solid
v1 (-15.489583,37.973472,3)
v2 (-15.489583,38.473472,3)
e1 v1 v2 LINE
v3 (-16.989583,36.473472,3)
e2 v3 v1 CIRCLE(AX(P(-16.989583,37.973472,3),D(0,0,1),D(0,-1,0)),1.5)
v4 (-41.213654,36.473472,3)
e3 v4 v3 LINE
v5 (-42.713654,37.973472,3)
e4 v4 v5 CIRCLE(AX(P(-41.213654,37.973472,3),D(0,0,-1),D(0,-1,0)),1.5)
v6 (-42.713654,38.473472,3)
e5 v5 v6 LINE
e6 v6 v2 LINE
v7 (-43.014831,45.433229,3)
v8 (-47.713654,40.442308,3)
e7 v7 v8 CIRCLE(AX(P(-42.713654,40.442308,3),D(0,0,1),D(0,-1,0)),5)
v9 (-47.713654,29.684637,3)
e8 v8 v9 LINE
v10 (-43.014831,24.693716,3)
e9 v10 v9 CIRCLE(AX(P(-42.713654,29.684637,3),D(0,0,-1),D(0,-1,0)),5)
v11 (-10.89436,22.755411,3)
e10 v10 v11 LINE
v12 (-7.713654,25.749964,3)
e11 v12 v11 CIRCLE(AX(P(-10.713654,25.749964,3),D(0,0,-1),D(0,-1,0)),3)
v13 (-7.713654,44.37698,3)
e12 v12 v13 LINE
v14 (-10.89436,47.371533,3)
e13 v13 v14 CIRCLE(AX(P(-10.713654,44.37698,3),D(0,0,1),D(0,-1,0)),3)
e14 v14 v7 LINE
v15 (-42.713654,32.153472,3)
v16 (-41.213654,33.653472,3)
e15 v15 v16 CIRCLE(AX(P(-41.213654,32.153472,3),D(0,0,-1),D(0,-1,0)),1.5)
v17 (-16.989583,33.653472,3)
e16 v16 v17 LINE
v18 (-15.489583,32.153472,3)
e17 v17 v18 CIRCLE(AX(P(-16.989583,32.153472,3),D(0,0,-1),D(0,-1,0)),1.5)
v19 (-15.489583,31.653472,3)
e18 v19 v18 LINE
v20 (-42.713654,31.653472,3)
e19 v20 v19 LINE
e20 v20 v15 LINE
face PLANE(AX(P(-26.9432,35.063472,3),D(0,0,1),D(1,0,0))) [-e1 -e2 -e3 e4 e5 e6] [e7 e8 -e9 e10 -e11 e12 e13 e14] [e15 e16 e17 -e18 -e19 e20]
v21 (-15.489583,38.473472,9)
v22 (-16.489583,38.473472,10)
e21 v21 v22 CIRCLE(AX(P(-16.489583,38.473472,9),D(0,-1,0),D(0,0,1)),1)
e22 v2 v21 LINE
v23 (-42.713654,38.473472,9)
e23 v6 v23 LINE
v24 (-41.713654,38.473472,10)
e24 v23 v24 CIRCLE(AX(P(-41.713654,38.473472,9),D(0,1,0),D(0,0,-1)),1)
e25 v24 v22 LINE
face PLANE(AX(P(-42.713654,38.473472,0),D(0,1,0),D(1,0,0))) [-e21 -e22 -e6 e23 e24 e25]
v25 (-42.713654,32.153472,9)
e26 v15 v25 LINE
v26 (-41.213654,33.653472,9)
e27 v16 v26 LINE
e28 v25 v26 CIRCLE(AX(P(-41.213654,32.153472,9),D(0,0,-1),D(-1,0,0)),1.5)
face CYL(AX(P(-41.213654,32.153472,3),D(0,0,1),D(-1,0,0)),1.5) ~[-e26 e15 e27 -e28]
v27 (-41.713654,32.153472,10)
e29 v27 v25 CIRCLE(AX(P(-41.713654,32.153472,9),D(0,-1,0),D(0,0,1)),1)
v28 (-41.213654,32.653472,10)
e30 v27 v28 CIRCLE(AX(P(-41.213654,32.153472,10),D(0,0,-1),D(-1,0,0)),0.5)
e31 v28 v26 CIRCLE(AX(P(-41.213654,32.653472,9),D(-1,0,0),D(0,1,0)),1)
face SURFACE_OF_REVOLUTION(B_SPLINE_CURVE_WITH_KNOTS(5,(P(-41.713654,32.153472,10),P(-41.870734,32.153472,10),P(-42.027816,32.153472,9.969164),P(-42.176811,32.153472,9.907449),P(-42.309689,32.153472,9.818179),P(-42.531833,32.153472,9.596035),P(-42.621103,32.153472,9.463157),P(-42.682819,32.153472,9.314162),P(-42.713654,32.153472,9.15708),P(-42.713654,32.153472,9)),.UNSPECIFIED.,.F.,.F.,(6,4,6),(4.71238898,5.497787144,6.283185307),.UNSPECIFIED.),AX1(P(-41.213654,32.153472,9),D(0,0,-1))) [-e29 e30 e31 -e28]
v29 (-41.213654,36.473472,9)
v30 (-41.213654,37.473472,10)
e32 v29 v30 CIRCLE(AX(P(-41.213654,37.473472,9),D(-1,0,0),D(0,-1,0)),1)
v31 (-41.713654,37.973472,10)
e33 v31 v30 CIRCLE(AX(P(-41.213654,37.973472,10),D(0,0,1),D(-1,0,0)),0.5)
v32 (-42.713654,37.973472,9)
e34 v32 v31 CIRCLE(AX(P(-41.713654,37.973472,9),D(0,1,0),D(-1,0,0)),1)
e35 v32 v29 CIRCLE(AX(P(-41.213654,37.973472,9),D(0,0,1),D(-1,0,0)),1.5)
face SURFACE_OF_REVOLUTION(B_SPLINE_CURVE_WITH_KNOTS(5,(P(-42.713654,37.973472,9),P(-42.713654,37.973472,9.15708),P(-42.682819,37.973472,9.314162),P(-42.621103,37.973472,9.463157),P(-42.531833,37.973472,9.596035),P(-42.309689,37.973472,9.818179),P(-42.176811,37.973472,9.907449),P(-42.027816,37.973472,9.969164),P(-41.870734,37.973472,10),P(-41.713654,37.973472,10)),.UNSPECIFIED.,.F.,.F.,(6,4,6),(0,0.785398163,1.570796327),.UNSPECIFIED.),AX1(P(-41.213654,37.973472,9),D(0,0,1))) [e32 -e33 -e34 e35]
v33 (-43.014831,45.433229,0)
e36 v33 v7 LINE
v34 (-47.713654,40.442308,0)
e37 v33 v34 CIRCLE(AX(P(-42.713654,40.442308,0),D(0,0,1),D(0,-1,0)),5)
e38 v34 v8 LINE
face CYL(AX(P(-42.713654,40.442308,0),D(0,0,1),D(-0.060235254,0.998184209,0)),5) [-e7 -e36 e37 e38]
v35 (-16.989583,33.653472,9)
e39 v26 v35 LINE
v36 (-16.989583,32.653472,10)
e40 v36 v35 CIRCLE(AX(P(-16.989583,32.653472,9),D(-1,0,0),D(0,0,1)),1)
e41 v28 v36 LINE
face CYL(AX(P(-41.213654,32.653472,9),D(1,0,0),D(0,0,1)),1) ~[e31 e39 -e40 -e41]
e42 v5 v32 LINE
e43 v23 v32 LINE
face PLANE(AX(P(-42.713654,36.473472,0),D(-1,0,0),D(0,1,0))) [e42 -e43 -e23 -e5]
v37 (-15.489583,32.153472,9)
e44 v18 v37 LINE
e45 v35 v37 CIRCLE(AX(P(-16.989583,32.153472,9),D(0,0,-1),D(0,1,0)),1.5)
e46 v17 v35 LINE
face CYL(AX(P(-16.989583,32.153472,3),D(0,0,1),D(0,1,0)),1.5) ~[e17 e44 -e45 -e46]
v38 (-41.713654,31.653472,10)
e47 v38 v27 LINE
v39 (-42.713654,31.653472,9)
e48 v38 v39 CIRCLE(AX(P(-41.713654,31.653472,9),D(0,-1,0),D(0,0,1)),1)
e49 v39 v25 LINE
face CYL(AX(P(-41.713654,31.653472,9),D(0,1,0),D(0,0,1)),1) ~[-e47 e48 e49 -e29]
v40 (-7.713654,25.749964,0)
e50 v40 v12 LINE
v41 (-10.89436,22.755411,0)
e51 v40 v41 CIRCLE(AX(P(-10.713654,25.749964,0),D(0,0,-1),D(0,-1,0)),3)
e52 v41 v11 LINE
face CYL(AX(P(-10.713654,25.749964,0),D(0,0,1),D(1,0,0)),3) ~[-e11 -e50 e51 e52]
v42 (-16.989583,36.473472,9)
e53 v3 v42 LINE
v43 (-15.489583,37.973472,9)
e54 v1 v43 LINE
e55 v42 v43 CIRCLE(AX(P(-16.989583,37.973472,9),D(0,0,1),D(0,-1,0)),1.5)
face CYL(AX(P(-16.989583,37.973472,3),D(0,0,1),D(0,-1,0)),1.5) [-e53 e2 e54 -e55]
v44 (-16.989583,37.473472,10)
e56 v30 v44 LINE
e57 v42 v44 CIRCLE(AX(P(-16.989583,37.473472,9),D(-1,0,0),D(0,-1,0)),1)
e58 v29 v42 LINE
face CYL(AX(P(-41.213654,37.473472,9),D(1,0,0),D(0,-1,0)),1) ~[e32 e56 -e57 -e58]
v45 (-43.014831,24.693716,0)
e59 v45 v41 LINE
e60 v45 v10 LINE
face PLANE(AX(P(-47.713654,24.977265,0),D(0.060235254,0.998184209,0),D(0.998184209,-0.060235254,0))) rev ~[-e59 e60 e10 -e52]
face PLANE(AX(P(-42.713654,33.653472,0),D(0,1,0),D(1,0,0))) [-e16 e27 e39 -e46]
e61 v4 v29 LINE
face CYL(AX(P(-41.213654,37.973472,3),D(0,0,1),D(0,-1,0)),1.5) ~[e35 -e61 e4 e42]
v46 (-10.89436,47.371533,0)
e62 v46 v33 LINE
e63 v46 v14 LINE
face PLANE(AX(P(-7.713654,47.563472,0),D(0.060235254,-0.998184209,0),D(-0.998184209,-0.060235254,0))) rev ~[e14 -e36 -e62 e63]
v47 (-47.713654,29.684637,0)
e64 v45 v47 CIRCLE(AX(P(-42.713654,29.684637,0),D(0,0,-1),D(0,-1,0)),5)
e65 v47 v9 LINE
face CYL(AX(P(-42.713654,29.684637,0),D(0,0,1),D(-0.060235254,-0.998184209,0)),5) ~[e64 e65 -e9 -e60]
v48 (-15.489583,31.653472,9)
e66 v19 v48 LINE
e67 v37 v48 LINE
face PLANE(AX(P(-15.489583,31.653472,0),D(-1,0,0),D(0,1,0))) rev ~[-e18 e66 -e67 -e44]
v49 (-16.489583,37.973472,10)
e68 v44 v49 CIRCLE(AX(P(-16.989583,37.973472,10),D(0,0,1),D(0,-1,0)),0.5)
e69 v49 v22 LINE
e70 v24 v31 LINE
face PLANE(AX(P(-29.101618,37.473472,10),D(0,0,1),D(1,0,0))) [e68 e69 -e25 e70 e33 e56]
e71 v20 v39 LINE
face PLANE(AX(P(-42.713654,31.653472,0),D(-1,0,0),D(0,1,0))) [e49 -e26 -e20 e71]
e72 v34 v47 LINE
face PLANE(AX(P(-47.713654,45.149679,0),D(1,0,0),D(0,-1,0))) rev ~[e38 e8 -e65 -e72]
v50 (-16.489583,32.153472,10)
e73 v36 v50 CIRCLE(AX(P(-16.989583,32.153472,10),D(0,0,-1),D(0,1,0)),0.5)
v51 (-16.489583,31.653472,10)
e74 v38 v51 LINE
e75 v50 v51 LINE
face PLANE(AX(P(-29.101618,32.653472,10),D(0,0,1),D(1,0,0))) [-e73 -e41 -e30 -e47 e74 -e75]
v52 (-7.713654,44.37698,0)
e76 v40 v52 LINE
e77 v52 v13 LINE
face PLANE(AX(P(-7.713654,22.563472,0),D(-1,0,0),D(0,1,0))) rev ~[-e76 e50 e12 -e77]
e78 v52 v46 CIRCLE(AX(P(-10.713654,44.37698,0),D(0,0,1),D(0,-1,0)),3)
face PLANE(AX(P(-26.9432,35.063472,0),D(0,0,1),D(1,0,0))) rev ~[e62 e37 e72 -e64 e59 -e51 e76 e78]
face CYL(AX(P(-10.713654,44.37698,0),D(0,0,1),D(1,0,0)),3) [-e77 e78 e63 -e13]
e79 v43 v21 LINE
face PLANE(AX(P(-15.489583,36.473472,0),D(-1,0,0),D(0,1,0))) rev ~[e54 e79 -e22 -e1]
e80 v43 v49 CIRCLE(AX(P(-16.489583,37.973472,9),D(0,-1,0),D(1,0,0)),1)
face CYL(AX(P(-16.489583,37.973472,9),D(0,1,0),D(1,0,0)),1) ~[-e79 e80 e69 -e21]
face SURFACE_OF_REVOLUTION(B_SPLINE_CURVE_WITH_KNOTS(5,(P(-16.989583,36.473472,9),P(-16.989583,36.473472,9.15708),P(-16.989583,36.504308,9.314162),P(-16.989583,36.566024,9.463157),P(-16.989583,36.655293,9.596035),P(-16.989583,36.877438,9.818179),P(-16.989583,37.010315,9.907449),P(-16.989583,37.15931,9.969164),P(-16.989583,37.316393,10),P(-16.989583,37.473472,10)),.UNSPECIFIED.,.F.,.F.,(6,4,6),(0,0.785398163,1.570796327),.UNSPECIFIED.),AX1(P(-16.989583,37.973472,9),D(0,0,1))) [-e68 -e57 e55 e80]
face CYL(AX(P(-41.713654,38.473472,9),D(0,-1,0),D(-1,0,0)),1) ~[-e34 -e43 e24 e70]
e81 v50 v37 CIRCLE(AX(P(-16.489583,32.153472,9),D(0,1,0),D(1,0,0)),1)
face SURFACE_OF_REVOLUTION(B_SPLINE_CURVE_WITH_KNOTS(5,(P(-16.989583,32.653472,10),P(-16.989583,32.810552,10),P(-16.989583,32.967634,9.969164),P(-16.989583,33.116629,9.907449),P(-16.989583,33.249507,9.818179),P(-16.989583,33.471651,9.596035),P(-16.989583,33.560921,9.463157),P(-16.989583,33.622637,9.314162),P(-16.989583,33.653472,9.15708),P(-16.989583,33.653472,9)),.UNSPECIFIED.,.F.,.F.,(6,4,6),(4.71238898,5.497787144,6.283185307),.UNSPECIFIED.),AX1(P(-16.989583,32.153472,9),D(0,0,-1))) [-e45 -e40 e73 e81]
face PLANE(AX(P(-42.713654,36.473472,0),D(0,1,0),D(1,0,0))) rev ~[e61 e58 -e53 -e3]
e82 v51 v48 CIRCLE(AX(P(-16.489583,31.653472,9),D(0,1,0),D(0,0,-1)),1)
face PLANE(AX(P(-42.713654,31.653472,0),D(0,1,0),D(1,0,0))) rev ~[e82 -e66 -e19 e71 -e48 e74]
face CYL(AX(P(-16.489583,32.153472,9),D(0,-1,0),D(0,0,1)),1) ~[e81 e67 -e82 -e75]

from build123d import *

# Parameters (mm, degrees)
F0_W     = 27.2240719226
F0_H     = 2
F1_DEPTH = 3
F2_DEPTH = 10
F3_R     = 1.5
F4_R     = 1
F5_R     = 3
F6_R     = 5


with BuildPart() as f1:
    # F0 (on Top) → F1 (new body)
    with BuildSketch(Plane.XY):
        Polygon((-7.7136544558, 22.5634722376), (-7.7136544558, 47.5634722376), (-47.7136544558, 45.1496791341), (-47.7136544558, 24.977265341), align=None)
        with Locations((-29.1016184945, 32.6534722376)):
            Rectangle(F0_W, F0_H, mode=Mode.SUBTRACT)
        with Locations((-29.1016184945, 37.4734722376)):
            Rectangle(F0_W, F0_H, mode=Mode.SUBTRACT)
    extrude(amount=F1_DEPTH)

    # F0 (on Top) → F2 (join)
    with BuildSketch(Plane.XY):
        with Locations((-29.1016184945, 32.6534722376)):
            Rectangle(F0_W, F0_H)
        with Locations((-29.1016184945, 37.4734722376)):
            Rectangle(F0_W, F0_H)
    extrude(amount=F2_DEPTH)

    # F3
    f3_edges = [f1.edges().sort_by_distance(p)[0] for p in [
        (-42.713654, 36.473472, 6.5),
        (-42.713654, 33.653472, 6.5),
        (-15.489583, 36.473472, 6.5),
        (-15.489583, 33.653472, 6.5),
    ]]
    fillet(f3_edges, radius=F3_R)

    # F4
    f4_edges = [f1.edges().sort_by_distance(p)[0] for p in [
        (-29.101618, 36.473472, 10),
        (-29.101618, 33.653472, 10),
        (-42.713654, 31.903472, 10),
        (-42.274315, 33.214132, 10),
        (-15.489583, 31.903472, 10),
        (-15.928922, 33.214132, 10),
        (-15.928922, 36.912812, 10),
        (-42.274315, 36.912812, 10),
        (-15.489583, 38.223472, 10),
        (-42.713654, 38.223472, 10),
    ]]
    fillet(f4_edges, radius=F4_R)

    # F5
    f5_edges = [f1.edges().sort_by_distance(p)[0] for p in [
        (-7.713654, 22.563472, 1.5),
        (-7.713654, 47.563472, 1.5),
    ]]
    fillet(f5_edges, radius=F5_R)

    # F6
    f6_edges = [f1.edges().sort_by_distance(p)[0] for p in [
        (-47.713654, 45.149679, 1.5),
        (-47.713654, 24.977265, 1.5),
    ]]
    fillet(f6_edges, radius=F6_R)


solid = f1.part
